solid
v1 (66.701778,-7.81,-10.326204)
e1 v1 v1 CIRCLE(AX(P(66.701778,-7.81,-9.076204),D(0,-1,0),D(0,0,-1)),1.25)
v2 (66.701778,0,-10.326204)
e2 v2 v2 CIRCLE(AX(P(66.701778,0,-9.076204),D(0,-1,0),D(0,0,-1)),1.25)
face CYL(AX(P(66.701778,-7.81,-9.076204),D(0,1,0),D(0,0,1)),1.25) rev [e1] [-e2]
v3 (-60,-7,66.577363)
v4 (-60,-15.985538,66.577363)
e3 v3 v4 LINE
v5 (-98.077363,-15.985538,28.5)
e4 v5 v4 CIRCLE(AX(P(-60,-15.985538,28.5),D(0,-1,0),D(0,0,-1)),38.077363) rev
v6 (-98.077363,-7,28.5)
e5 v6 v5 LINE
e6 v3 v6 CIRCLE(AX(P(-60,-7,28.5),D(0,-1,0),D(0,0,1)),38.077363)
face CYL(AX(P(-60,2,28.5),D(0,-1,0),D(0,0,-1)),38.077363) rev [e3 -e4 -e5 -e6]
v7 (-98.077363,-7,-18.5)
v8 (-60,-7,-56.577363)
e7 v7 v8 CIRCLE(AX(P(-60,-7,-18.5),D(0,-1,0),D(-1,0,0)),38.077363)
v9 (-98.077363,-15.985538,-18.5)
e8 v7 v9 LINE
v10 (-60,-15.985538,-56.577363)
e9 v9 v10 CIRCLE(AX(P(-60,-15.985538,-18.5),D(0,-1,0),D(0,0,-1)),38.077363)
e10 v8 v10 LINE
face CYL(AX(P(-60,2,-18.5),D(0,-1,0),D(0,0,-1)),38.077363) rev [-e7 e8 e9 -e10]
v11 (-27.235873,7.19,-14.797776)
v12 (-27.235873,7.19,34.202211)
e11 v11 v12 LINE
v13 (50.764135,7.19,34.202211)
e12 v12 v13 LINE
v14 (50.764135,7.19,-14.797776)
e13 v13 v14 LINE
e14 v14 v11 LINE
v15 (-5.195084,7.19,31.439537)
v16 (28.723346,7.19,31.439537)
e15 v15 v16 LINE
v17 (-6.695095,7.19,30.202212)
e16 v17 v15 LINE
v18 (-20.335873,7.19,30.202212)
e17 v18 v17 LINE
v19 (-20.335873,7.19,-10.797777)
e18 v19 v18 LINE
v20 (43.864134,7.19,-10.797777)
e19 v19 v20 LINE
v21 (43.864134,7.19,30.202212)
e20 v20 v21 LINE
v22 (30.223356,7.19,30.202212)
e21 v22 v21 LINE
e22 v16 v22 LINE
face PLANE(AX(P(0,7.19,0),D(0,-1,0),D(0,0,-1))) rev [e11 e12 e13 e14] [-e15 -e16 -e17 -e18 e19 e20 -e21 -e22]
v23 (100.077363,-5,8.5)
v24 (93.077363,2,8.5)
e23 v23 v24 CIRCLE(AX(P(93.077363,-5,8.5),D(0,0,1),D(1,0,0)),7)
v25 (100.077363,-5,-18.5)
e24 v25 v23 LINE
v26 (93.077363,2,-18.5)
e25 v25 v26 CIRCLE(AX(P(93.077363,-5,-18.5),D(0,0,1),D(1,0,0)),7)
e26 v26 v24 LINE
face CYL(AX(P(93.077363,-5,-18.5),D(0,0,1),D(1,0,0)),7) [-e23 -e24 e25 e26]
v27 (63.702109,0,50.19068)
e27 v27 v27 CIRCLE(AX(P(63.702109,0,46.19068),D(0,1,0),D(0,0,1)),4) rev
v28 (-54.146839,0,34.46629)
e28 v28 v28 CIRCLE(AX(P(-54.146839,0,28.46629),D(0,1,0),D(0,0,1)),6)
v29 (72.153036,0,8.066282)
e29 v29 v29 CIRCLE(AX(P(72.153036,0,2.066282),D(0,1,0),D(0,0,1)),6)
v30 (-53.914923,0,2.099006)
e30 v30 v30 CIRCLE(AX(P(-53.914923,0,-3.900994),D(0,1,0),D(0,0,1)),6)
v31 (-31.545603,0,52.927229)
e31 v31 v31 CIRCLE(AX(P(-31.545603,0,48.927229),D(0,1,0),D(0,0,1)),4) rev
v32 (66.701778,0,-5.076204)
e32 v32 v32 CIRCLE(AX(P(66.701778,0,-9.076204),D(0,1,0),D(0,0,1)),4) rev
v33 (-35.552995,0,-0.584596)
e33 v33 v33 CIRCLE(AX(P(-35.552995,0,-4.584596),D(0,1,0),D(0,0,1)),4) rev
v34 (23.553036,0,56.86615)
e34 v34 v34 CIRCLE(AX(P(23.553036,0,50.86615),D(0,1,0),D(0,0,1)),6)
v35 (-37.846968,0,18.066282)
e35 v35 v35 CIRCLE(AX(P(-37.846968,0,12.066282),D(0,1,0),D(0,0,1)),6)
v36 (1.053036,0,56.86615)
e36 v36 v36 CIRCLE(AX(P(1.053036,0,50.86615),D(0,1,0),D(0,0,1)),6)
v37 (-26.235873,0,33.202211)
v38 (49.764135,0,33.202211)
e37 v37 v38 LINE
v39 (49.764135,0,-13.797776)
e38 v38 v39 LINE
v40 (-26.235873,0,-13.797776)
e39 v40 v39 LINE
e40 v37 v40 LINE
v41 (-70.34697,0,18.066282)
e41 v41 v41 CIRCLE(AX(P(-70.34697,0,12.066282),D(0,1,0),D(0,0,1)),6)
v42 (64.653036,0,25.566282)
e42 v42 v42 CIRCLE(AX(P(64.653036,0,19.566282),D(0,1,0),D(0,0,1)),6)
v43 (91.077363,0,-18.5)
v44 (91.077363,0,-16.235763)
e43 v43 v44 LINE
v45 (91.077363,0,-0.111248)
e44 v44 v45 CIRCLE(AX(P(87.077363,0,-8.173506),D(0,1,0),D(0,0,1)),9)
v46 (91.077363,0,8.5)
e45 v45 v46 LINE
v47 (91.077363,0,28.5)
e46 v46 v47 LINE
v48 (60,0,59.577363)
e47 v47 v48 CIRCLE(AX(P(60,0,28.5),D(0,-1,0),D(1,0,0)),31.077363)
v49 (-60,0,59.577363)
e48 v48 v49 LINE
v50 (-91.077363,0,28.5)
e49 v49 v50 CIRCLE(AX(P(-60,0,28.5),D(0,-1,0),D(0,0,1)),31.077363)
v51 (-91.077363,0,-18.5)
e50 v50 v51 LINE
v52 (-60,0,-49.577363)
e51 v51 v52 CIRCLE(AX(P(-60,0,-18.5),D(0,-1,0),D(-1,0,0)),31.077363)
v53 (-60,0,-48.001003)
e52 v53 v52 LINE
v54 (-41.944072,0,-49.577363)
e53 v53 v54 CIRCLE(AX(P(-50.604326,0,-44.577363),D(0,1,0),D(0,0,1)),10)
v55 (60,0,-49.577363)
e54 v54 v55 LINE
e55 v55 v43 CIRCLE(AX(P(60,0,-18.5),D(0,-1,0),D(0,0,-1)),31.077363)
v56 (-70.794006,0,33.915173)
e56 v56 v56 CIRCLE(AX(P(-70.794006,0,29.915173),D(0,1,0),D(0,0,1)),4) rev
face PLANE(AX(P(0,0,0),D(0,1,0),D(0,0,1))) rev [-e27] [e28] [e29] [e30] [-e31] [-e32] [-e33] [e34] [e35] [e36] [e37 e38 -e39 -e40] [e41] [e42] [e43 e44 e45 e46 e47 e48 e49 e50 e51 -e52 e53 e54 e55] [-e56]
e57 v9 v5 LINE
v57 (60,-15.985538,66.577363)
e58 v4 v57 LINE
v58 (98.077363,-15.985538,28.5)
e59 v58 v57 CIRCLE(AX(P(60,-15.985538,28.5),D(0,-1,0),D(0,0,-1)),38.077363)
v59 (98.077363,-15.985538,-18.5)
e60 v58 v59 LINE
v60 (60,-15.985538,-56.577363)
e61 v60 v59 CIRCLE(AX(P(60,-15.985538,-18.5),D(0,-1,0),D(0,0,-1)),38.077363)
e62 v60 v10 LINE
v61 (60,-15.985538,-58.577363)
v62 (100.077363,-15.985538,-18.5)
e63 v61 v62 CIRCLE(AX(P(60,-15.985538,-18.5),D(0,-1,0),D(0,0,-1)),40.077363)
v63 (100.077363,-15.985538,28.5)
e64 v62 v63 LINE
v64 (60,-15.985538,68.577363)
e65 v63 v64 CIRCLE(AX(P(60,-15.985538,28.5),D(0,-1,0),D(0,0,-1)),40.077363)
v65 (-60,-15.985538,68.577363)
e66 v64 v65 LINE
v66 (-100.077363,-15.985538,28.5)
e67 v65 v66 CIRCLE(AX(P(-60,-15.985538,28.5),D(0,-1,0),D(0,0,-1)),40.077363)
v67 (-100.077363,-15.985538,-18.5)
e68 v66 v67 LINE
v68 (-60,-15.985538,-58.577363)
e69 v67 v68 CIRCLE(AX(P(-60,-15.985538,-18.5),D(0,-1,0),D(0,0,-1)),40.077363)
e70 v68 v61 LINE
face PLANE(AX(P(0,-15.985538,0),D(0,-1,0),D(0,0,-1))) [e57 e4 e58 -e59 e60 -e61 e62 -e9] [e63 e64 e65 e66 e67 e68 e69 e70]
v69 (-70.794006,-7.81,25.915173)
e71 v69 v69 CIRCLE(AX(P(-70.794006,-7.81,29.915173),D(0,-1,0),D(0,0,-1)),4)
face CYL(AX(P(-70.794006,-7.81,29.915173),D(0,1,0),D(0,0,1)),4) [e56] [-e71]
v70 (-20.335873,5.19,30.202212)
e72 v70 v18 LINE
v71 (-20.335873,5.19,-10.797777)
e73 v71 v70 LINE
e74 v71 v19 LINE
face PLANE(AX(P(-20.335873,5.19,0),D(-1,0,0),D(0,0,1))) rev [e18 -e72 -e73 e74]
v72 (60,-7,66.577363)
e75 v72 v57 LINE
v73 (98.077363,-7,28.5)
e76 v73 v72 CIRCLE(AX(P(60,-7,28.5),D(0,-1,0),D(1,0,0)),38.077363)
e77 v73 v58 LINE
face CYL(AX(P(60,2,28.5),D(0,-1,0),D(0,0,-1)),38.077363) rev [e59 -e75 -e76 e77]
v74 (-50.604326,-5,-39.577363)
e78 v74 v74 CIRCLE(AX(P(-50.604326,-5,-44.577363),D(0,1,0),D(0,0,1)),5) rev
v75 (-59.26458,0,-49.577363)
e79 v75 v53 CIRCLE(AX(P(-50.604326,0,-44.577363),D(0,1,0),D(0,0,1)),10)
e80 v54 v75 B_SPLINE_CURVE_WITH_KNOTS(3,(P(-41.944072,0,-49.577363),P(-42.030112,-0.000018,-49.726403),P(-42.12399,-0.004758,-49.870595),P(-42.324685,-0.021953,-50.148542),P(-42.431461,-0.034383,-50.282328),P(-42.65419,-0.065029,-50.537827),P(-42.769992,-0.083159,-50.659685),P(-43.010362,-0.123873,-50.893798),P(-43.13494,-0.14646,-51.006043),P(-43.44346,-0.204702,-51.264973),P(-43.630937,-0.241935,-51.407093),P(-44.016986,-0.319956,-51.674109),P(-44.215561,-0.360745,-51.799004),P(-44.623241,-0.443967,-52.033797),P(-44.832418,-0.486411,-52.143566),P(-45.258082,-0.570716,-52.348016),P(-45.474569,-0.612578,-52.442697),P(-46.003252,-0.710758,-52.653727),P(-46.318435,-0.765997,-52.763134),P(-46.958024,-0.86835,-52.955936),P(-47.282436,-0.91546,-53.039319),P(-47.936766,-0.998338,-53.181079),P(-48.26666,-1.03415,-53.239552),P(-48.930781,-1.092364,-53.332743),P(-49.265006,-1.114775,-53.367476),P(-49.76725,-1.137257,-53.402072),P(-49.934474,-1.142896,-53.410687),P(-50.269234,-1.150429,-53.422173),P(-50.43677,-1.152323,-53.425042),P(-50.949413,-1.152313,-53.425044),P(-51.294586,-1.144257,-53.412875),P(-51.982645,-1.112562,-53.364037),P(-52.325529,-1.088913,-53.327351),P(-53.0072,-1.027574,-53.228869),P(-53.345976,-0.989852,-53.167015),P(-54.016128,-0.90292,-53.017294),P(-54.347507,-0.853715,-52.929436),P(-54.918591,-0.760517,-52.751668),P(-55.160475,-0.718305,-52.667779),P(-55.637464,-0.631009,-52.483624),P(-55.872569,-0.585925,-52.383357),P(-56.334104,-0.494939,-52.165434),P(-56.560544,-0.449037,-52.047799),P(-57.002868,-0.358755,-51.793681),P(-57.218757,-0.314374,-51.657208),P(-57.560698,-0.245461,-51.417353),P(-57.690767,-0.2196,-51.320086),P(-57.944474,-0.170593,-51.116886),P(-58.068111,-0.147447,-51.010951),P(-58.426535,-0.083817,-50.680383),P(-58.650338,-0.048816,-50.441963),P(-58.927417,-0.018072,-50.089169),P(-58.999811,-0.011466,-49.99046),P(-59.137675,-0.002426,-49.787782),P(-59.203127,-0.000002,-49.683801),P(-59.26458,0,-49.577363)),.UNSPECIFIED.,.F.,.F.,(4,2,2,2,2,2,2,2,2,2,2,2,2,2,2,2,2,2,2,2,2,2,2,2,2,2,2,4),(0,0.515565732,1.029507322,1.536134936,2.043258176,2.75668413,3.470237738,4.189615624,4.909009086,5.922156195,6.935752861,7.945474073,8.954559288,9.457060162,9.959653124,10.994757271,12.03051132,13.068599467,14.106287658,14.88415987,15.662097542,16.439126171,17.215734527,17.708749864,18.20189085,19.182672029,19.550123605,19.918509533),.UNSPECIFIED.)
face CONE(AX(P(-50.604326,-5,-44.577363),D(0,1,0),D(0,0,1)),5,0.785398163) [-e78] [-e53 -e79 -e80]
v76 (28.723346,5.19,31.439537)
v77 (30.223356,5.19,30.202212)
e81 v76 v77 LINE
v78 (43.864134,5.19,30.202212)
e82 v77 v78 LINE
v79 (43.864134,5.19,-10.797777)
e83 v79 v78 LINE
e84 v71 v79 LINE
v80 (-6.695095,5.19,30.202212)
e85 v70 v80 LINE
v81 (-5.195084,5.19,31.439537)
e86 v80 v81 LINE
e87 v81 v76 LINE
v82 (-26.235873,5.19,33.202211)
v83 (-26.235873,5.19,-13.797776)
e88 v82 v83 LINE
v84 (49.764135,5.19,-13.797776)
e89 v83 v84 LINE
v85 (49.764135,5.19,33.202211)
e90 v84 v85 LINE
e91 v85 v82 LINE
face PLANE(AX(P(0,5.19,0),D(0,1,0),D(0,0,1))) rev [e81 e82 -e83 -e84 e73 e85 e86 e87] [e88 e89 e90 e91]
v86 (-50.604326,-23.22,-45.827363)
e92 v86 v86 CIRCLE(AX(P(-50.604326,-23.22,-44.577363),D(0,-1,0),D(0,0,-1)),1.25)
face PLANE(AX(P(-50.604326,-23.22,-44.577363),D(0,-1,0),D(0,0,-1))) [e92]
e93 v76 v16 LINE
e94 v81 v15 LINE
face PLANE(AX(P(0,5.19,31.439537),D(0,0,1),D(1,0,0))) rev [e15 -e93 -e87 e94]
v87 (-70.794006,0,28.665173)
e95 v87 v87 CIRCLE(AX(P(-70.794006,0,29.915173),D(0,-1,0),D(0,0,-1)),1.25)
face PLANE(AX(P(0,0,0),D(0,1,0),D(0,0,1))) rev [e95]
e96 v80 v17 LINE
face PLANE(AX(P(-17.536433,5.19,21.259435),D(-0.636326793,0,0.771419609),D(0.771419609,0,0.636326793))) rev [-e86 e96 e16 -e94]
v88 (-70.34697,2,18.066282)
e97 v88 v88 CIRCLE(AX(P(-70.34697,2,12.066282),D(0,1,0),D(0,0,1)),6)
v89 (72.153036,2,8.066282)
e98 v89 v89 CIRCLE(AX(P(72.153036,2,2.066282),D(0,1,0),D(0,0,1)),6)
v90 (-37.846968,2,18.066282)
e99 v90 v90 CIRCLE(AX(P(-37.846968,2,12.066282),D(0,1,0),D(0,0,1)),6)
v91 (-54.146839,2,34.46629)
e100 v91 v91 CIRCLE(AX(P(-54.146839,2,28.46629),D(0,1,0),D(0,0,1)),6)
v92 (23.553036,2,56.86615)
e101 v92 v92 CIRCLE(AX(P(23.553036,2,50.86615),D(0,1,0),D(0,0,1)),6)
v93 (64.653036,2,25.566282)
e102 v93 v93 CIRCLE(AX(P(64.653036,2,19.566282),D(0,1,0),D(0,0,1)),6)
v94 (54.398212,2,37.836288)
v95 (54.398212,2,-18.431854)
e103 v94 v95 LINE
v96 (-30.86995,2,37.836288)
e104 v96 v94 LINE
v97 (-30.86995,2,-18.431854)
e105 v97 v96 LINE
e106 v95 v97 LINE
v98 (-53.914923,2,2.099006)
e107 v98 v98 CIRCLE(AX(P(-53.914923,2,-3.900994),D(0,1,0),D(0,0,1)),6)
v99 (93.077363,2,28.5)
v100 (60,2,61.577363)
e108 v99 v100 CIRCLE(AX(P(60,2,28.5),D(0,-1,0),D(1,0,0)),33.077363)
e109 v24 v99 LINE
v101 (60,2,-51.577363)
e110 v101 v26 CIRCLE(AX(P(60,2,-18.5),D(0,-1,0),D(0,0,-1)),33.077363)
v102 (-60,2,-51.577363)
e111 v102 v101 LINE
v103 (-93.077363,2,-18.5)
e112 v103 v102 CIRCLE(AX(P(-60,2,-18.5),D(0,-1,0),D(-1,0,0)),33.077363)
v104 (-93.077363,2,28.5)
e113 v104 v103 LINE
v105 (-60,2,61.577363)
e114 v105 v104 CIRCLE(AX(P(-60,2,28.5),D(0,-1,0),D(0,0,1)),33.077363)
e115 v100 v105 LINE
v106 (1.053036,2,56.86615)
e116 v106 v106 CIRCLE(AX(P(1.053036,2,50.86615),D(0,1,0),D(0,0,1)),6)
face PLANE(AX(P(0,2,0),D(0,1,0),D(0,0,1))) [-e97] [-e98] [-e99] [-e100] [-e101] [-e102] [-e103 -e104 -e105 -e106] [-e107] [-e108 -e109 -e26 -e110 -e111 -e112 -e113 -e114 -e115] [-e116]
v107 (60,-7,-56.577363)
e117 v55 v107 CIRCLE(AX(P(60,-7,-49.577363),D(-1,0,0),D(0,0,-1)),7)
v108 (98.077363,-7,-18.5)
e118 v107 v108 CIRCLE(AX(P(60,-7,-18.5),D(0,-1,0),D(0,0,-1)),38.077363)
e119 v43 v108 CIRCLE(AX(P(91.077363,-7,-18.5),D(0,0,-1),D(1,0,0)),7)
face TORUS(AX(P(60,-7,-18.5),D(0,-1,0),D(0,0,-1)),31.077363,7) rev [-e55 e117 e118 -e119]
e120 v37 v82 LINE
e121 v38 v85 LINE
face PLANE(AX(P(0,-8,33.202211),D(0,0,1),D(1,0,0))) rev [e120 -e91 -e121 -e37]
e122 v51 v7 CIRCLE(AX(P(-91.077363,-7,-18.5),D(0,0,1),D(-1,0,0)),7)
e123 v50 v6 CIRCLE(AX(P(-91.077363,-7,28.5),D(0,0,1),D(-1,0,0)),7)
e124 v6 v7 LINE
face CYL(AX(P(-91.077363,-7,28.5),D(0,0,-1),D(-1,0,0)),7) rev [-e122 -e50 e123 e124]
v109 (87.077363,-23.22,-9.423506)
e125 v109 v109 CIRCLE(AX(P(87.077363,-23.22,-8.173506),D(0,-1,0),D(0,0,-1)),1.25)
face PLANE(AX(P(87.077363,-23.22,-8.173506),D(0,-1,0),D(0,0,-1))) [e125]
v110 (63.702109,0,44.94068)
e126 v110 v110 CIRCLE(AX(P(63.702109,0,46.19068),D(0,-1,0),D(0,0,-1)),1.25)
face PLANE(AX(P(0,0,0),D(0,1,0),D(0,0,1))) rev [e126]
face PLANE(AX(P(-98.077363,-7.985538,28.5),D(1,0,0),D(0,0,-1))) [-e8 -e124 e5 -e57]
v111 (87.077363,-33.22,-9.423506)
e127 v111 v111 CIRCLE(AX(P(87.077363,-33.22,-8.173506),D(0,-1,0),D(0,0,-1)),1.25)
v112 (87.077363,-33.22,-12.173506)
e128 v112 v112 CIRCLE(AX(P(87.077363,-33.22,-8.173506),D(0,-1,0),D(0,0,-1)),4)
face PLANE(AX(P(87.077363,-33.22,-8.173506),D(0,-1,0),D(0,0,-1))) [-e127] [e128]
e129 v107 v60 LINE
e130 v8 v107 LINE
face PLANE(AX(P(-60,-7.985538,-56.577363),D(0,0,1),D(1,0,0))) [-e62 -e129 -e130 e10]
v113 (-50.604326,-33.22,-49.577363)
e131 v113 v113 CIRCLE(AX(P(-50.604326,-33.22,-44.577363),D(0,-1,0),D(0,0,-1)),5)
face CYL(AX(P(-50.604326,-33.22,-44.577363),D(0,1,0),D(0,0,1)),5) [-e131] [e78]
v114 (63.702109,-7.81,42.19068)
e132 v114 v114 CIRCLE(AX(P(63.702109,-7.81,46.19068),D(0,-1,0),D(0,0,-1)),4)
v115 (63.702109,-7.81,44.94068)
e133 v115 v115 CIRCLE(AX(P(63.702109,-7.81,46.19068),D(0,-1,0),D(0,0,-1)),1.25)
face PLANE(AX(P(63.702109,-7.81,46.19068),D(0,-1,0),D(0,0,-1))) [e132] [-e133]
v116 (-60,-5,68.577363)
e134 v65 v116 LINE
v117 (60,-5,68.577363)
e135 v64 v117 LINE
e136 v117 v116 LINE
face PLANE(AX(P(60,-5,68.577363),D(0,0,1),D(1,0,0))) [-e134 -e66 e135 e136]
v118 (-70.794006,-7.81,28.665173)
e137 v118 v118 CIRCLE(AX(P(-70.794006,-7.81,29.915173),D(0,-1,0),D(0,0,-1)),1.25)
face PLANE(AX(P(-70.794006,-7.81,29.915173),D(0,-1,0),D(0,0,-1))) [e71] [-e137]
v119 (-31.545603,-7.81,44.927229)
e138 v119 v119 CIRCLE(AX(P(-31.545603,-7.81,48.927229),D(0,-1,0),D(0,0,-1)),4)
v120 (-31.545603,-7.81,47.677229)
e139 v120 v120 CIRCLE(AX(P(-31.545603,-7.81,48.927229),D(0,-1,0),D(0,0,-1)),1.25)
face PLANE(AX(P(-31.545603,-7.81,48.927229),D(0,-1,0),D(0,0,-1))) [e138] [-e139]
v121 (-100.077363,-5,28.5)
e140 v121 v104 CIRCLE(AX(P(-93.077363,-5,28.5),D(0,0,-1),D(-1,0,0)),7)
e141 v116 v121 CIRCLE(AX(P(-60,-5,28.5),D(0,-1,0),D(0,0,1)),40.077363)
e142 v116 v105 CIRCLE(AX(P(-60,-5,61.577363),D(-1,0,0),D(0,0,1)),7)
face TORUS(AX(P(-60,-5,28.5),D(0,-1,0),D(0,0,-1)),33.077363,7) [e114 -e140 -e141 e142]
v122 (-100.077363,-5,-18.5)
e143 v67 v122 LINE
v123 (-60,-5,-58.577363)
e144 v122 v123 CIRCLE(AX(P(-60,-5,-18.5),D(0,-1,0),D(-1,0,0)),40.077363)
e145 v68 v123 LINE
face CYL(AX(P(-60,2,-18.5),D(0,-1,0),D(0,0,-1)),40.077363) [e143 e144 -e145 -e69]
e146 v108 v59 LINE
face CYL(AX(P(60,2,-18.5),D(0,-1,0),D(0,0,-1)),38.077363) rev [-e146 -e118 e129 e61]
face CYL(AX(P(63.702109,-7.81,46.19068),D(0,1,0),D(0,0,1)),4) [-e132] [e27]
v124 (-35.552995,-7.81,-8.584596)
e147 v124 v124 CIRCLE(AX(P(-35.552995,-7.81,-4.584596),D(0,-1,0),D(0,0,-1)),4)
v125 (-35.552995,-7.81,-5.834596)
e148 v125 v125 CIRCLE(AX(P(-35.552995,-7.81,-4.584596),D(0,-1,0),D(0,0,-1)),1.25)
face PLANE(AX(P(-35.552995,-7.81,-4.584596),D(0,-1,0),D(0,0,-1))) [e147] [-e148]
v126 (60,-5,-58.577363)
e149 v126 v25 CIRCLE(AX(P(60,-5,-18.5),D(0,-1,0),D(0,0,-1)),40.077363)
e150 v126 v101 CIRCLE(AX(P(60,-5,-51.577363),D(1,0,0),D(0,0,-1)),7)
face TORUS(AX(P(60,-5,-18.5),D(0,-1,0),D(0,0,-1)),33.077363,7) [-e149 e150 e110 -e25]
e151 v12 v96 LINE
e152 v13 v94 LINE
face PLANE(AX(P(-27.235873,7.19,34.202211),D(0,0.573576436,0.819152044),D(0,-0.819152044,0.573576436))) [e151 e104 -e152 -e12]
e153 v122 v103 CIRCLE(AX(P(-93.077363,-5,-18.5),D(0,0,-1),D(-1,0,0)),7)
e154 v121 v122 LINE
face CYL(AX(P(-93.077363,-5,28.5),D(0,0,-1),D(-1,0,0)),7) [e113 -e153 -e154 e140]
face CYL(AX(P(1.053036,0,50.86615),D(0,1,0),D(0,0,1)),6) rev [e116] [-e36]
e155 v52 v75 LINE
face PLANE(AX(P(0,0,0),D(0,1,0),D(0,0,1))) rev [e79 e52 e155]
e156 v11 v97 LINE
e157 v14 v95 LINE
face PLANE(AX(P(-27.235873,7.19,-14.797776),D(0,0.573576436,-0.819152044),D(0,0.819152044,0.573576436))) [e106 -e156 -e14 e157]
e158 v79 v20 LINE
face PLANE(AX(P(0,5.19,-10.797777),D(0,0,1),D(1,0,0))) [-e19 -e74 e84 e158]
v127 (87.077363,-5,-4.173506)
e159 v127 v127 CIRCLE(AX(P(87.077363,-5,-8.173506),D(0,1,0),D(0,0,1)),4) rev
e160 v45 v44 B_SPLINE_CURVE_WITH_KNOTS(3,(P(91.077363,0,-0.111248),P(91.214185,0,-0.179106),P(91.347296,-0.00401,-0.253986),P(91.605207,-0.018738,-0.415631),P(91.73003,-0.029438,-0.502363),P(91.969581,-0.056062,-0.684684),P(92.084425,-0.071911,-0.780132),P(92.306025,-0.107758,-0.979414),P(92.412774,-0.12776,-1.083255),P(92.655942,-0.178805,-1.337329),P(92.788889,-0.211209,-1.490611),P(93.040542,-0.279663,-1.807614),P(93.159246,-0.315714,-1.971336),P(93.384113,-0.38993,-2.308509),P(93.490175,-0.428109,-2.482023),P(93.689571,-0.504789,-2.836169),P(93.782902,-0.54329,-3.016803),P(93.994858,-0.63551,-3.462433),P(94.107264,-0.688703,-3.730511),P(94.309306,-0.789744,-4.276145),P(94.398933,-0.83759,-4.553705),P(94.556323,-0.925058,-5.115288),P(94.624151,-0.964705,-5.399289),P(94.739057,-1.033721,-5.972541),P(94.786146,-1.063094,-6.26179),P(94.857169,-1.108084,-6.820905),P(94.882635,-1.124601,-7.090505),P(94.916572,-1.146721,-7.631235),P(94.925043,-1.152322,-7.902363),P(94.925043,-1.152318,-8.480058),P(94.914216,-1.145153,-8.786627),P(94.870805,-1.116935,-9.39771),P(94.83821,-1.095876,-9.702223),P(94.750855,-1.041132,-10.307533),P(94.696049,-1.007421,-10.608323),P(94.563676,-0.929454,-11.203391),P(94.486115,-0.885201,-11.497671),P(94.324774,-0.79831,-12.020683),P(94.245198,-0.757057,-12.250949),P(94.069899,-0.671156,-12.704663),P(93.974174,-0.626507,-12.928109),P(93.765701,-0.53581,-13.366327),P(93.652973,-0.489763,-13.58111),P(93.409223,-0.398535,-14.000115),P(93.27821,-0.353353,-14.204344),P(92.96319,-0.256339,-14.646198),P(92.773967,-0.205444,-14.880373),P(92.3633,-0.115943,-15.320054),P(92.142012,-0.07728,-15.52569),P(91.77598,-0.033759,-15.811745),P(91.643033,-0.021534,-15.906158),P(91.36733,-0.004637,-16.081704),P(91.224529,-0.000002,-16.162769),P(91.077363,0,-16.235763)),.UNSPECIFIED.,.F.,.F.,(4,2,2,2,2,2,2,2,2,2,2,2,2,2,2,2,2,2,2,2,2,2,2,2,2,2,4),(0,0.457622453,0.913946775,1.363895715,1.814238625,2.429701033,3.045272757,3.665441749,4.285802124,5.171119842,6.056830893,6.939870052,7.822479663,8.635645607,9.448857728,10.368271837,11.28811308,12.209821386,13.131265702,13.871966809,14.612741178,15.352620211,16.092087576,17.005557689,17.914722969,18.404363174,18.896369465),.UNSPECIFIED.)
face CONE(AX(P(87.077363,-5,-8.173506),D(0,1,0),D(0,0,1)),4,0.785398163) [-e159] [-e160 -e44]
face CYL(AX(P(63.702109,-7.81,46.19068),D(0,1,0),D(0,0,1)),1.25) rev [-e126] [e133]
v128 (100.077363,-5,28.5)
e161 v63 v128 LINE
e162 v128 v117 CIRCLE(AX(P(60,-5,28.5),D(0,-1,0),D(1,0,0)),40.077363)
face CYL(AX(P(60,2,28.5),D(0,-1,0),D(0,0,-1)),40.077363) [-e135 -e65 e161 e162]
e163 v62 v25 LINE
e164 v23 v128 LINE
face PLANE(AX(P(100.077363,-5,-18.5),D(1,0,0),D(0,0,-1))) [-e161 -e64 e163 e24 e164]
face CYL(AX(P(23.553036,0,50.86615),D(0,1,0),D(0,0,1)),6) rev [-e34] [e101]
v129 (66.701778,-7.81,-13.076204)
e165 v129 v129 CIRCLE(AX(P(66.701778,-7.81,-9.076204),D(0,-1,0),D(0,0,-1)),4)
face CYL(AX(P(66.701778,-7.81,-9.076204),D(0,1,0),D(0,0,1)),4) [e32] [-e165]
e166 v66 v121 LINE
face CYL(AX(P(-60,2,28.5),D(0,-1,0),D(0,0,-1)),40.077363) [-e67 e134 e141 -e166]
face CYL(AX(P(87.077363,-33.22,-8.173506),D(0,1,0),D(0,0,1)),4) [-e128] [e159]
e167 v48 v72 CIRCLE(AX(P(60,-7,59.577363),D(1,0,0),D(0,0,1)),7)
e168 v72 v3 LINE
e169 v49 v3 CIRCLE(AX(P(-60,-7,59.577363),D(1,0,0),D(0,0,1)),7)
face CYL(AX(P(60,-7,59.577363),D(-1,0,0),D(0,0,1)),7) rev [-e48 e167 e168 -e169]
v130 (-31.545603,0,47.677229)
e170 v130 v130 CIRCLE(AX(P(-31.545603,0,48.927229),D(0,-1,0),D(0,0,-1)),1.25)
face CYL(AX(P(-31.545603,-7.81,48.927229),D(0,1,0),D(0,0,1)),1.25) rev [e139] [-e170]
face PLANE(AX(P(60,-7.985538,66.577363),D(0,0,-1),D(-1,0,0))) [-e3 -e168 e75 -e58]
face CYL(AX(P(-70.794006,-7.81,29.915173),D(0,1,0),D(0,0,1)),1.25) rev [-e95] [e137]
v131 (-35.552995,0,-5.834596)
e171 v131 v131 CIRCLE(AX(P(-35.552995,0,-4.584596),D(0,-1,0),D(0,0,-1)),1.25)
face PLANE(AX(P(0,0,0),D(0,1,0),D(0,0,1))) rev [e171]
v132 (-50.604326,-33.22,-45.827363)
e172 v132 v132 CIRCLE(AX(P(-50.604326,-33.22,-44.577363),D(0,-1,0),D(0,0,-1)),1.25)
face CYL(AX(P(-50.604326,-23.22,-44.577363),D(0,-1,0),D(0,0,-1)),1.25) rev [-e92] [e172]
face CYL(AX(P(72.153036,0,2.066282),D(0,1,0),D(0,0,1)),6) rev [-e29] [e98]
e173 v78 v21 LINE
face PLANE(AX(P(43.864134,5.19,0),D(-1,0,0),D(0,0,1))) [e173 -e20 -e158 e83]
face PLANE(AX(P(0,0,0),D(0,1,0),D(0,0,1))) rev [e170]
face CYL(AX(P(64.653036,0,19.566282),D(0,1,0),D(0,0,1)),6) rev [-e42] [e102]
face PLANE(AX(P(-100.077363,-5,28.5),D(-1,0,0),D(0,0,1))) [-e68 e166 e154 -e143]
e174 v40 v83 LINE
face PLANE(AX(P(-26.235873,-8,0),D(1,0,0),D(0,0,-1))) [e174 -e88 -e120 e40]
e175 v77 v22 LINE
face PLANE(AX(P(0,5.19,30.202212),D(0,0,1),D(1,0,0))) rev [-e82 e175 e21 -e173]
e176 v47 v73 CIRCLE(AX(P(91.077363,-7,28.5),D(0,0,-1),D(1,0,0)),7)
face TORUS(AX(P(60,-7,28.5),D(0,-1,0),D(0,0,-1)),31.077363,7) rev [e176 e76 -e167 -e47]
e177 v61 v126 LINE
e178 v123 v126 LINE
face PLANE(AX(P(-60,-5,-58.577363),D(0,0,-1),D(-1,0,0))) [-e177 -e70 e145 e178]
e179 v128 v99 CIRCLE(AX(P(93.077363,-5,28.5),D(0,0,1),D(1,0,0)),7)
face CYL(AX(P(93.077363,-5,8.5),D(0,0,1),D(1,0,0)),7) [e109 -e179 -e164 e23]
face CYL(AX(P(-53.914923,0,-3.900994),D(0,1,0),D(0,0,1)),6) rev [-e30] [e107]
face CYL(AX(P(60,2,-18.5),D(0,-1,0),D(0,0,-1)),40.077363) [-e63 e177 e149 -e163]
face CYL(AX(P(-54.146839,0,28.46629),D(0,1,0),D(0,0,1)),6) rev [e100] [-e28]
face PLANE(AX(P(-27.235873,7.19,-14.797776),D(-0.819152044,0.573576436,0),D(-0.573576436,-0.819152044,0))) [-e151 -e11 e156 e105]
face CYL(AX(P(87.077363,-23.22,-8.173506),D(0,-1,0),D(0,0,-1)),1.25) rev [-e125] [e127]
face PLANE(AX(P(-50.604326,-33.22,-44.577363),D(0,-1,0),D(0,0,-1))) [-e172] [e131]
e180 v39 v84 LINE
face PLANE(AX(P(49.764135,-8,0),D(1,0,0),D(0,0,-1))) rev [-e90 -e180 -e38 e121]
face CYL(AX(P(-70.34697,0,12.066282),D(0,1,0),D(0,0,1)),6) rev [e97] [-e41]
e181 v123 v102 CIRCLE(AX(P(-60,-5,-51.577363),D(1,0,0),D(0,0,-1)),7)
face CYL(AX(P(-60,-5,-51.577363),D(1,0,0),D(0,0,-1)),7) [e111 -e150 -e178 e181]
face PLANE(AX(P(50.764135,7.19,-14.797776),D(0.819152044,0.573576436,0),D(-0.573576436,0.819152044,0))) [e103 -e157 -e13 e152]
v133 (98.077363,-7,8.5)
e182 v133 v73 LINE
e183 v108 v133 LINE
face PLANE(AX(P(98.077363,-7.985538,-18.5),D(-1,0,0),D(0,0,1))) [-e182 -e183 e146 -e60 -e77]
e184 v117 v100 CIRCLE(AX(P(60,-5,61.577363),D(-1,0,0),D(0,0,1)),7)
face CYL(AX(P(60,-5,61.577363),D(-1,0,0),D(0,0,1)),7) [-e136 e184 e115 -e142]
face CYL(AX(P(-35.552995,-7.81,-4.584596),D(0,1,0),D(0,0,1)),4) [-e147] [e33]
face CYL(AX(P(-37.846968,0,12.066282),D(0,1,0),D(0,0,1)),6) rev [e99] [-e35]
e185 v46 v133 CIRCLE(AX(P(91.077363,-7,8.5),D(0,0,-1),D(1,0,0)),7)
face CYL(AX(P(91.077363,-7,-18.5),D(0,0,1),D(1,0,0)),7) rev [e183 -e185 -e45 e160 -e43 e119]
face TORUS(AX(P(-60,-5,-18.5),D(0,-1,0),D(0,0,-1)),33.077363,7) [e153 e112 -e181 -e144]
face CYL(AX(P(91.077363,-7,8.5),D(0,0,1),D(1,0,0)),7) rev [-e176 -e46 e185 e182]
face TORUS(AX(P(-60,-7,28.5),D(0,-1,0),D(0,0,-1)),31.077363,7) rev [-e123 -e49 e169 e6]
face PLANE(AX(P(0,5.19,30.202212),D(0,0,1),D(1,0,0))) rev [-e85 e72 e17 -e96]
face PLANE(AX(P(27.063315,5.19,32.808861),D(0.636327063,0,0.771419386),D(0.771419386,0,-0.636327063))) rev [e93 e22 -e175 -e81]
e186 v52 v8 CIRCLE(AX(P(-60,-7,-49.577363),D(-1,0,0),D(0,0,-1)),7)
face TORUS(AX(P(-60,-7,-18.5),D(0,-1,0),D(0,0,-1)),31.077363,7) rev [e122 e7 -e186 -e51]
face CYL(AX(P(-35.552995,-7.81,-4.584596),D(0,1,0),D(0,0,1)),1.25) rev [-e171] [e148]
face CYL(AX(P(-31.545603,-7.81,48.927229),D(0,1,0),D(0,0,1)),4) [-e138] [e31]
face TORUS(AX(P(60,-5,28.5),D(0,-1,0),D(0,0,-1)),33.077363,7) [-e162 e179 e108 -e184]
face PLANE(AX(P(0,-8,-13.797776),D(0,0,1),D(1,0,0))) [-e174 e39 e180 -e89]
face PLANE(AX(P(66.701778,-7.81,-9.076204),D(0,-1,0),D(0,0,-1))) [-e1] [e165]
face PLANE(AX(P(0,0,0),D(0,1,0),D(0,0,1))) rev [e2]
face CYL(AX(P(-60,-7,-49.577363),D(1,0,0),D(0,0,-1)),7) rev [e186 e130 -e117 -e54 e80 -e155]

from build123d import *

# Parameters (mm, degrees)
SKETCH1_W           = 160
SKETCH1_H           = 117
BOSS_EXTRUDE1_DEPTH = 2
SKETCH3_R           = 6
CUT_EXTRUDE1_DEPTH  = 100.127443223
SKETCH4_R           = 6
CUT_EXTRUDE3_DEPTH  = 100.127443223
SKETCH5_R           = 6
CUT_EXTRUDE4_DEPTH  = 100.127443223
SKETCH6_W           = 76.000007526
SKETCH6_H           = 46.999987397
SKETCH6_W_2         = 72.000007526
SKETCH6_H_2         = 42.999987397
CUT_EXTRUDE5_DEPTH  = 10
SKETCH7_R           = 4
SKETCH7_R_2         = 1.25
BOSS_EXTRUDE2_DEPTH = 7.81
SKETCH8_W           = 78.000007526
SKETCH8_H           = 48.999987397
SKETCH8_W_2         = 76.000007526
SKETCH8_H_2         = 46.999987397
BOSS_EXTRUDE3_DEPTH = 5.19
SKETCH9_W           = 76.000007526
SKETCH9_H           = 46.999987397
BOSS_EXTRUDE4_DEPTH = 2
DRAFT2_ANGLE        = 35
SKETCH12_W          = 160
SKETCH12_H          = 14.938358446
SKETCH12_W_2        = 31.199462864
SKETCH12_H_2        = 9.099678356
SKETCH12_W_3        = 31.607152295
SKETCH12_H_3        = 7.36210802
CUT_EXTRUDE7_DEPTH  = 10
SKETCH13_R          = 6
CUT_EXTRUDE8_DEPTH  = 10
SKETCH14_W          = 120
SKETCH14_H          = 2
SKETCH14_W_2        = 2
SKETCH14_H_2        = 47
SKETCH14_H_3        = 27
SKETCH14_H_4        = 20
BOSS_EXTRUDE5_DEPTH = 8
SKETCH15_R          = 5
SKETCH15_R_2        = 4
BOSS_EXTRUDE6_DEPTH = 33.22
CHAMFER1_SIZE       = 5
SKETCH16_R          = 1.25
CUT_EXTRUDE9_DEPTH  = 10


with BuildPart() as part:
    # Sketch1 → Boss-Extrude1 (new body)
    with BuildSketch(Plane(origin=(0, 0, 0), x_dir=(1, 0, 0), z_dir=(0, 1, 0))):
        Rectangle(SKETCH1_W, SKETCH1_H)
    extrude(amount=BOSS_EXTRUDE1_DEPTH)

    # Sketch3 → Cut-Extrude1 (cut, through all)
    with BuildSketch(Plane(origin=(0, 2, 0), x_dir=(1, 0, 0), z_dir=(0, 1, 0))):
        with Locations(Location((72.15303621, -2.066282122, 0), (0, 0, 270))):
            Circle(SKETCH3_R)
    extrude(amount=-CUT_EXTRUDE1_DEPTH, mode=Mode.SUBTRACT)

    # Sketch4 → Cut-Extrude3 (cut, through all)
    with BuildSketch(Plane(origin=(0, 2, 0), x_dir=(1, 0, 0), z_dir=(0, 1, 0))):
        with Locations(Location((23.553035896, -50.866150132, 0), (0, 0, 270))):
            Circle(SKETCH4_R)
    extrude(amount=-CUT_EXTRUDE3_DEPTH, mode=Mode.SUBTRACT)

    # Sketch5 → Cut-Extrude4 (cut, through all)
    with BuildSketch(Plane(origin=(0, 2, 0), x_dir=(1, 0, 0), z_dir=(0, 1, 0))):
        with Locations(Location((64.653036213, -19.566282124, 0), (0, 0, 270))):
            Circle(SKETCH5_R)
        with Locations(Location((-37.846967603, -12.066282143, 0), (0, 0, 270))):
            Circle(SKETCH5_R)
        with Locations(Location((1.053035896, -50.866150137, 0), (0, 0, 270))):
            Circle(SKETCH5_R)
        with Locations(Location((-53.91492316, 3.900994062, 0), (0, 0, 270))):
            Circle(SKETCH5_R)
        with Locations(Location((-70.34696951, -12.066282149, 0), (0, 0, 270))):
            Circle(SKETCH5_R)
        with Locations(Location((-54.14683932, -28.466289977, 0), (0, 0, 270))):
            Circle(SKETCH5_R)
    extrude(amount=-CUT_EXTRUDE4_DEPTH, mode=Mode.SUBTRACT)

    # Sketch6 → Cut-Extrude5 (cut)
    with BuildSketch(Plane(origin=(0, 2, 0), x_dir=(1, 0, 0), z_dir=(0, 1, 0))):
        with Locations((11.764130909, -9.702217308)):
            Rectangle(SKETCH6_W, SKETCH6_H)
        with Locations((11.764130909, -9.702217308)):
            Rectangle(SKETCH6_W_2, SKETCH6_H_2, mode=Mode.SUBTRACT)
    extrude(amount=-CUT_EXTRUDE5_DEPTH, mode=Mode.SUBTRACT)


with BuildPart() as cut_extrude5_kept_piece:
    # of the separate pieces the step leaves, the one the design keeps (cut_extrude5_pieces_kept)
    add(part.part.solids().sort_by_distance((80, 0, 58.5))[0])

    # Sketch7 → Boss-Extrude2 (add)
    # profile 1 of 5: a face of its own
    with BuildSketch(Plane.XZ):
        with Locations(Location((66.701777656, -9.076203809, 0), (0, 0, 90))):
            Circle(SKETCH7_R)
        with Locations(Location((66.701777656, -9.076203809, 0), (0, 0, 270))):
            Circle(SKETCH7_R_2, mode=Mode.SUBTRACT)
    # profile 2 of 5: a face of its own
    with BuildSketch(Plane.XZ):
        with Locations(Location((63.702108967, 46.190679909, 0), (0, 0, 90))):
            Circle(SKETCH7_R)
        with Locations(Location((63.702108967, 46.190679909, 0), (0, 0, 270))):
            Circle(SKETCH7_R_2, mode=Mode.SUBTRACT)
    # profile 3 of 5: a face of its own
    with BuildSketch(Plane.XZ):
        with Locations(Location((-31.54560253, 48.927228564, 0), (0, 0, 90))):
            Circle(SKETCH7_R)
        with Locations(Location((-31.54560253, 48.927228564, 0), (0, 0, 270))):
            Circle(SKETCH7_R_2, mode=Mode.SUBTRACT)
    # profile 4 of 5: a face of its own
    with BuildSketch(Plane.XZ):
        with Locations(Location((-70.794006102, 29.915173129, 0), (0, 0, 90))):
            Circle(SKETCH7_R)
        with Locations(Location((-70.794006102, 29.915173129, 0), (0, 0, 270))):
            Circle(SKETCH7_R_2, mode=Mode.SUBTRACT)
    # profile 5 of 5: a face of its own
    with BuildSketch(Plane.XZ):
        with Locations(Location((-35.552994644, -4.584596423, 0), (0, 0, 90))):
            Circle(SKETCH7_R)
        with Locations(Location((-35.552994644, -4.584596423, 0), (0, 0, 270))):
            Circle(SKETCH7_R_2, mode=Mode.SUBTRACT)
    extrude(amount=BOSS_EXTRUDE2_DEPTH)

    # Sketch8 → Boss-Extrude3 (add)
    with BuildSketch(Plane(origin=(0, 2, 0), x_dir=(1, 0, 0), z_dir=(0, 1, 0))):
        with Locations((11.764130909, -9.702217308)):
            Rectangle(SKETCH8_W, SKETCH8_H)
        with Locations((11.764130909, -9.702217308)):
            Rectangle(SKETCH8_W_2, SKETCH8_H_2, mode=Mode.SUBTRACT)
    extrude(amount=BOSS_EXTRUDE3_DEPTH)

    # Sketch9 → Boss-Extrude4 (add)
    with BuildSketch(Plane(origin=(0, 7.19, 0), x_dir=(1, 0, 0), z_dir=(0, 1, 0))):
        with Locations((11.764130909, -9.702217308)):
            Rectangle(SKETCH9_W, SKETCH9_H)
        Polygon((-5.195084148, -31.43953726), (-6.695094805, -30.202211996), (-20.335872635, -30.202211996), (-20.335872635, 10.797777117), (43.864134191, 10.797777117), (43.864134191, -30.202211996), (30.223355703, -30.202211996), (28.723346116, -31.43953726), align=None, mode=Mode.SUBTRACT)
    extrude(amount=-BOSS_EXTRUDE4_DEPTH)

    # Draft2
    draft2_faces = [cut_extrude5_kept_piece.faces().sort_by_distance(p)[0] for p in [
        (11.764130909, 4.595, -14.79777639),
        (-27.235872854, 4.595, 9.702217309),
        (11.764130909, 4.595, 34.202211007),
        (50.764134672, 4.595, 9.702217309),
    ]]
    draft(draft2_faces, Plane.ZX.offset(7.19), DRAFT2_ANGLE)

    # Sketch12 → Cut-Extrude7 (cut)
    with BuildSketch(Plane(origin=(0, 2, 0), x_dir=(1, 0, 0), z_dir=(0, 1, 0))):
        with Locations((0, 51.030820777)):
            Rectangle(SKETCH12_W, SKETCH12_H)
        with Locations((-64.400268568, -53.950160822)):
            Rectangle(SKETCH12_W_2, SKETCH12_H_2)
        with Locations((64.196423853, -54.81894599)):
            Rectangle(SKETCH12_W_3, SKETCH12_H_3)
    extrude(amount=-CUT_EXTRUDE7_DEPTH, mode=Mode.SUBTRACT)

    # Sweep1: sweep along a path in Sketch10
    with BuildLine(Plane(origin=(0, 2, 0), x_dir=(1, 0, 0), z_dir=(0, 1, 0))) as sweep1_path:
        Line((-60, 58.5), (60, 58.5))
        ThreePointArc((60, 58.5), (88.284271247, 46.784271247), (100, 18.5))
        Line((100, 18.5), (100, -28.5))
        ThreePointArc((100, -28.5), (88.284271247, -56.784271247), (60, -68.5))
        Line((60, -68.5), (-60, -68.5))
        ThreePointArc((-60, -68.5), (-88.284271247, -56.784271247), (-100, -28.5))
        Line((-100, -28.5), (-100, 18.5))
        ThreePointArc((-100, 18.5), (-88.284271247, 46.784271247), (-60, 58.5))
    # Sketch11 → Sweep1 (sweep)
    with BuildSketch(Plane.XY.offset(8.5)):
        with BuildLine():
            Line((80, 2), (93.077362885, 2))
            ThreePointArc((93.077362885, 2), (98.027110354, -0.050252532), (100.077362885, -5))
            Line((100.077362885, -5), (100.077362885, -7.985538351))
            Line((100.077362885, -7.985538351), (98.077362885, -7.985538351))
            Line((98.077362885, -7.985538351), (98.077362885, -7))
            ThreePointArc((98.077362885, -7), (96.027110354, -2.050252532), (91.077362885, 0))
            Line((91.077362885, 0), (80, 0))
            Line((80, 0), (80, 2))
        make_face()
    sweep(path=sweep1_path.line)

    # Sketch13 → Cut-Extrude8 (cut)
    with BuildSketch(Plane(origin=(0, 2, 0), x_dir=(1, 0, 0), z_dir=(0, 1, 0))):
        with Locations(Location((1.053035896, -50.866150137, 0), (0, 0, 270))):
            Circle(SKETCH13_R)
        with Locations(Location((23.553035896, -50.866150132, 0), (0, 0, 270))):
            Circle(SKETCH13_R)
    extrude(amount=-CUT_EXTRUDE8_DEPTH, mode=Mode.SUBTRACT)

    # Sketch14 → Boss-Extrude5 (add)
    with BuildSketch(Plane.XZ.offset(7.985538351)):
        with Locations((0, 67.577362885)):
            Rectangle(SKETCH14_W, SKETCH14_H)
        with BuildLine():
            Line((-60, 66.577362885), (-60, 68.577362885))
            ThreePointArc((-60, 68.577362885), (-88.338975068, 56.838975068), (-100.077362885, 28.5))
            Line((-100.077362885, 28.5), (-98.077362885, 28.5))
            ThreePointArc((-98.077362885, 28.5), (-86.924761506, 55.424761506), (-60, 66.577362885))
        make_face()
        with Locations((-99.077362885, 5)):
            Rectangle(SKETCH14_W_2, SKETCH14_H_2)
        with BuildLine():
            ThreePointArc((-98.077362885, -18.5), (-86.924761506, -45.424761506), (-60, -56.577362885))
            Line((-60, -56.577362885), (-60, -58.577362885))
            ThreePointArc((-60, -58.577362885), (-88.338975068, -46.838975068), (-100.077362885, -18.5))
            Line((-100.077362885, -18.5), (-98.077362885, -18.5))
        make_face()
        with Locations((0, -57.577362885)):
            Rectangle(SKETCH14_W, SKETCH14_H)
        with BuildLine():
            ThreePointArc((60, -56.577362885), (86.924761506, -45.424761506), (98.077362885, -18.5))
            Line((98.077362885, -18.5), (100.077362885, -18.5))
            ThreePointArc((100.077362885, -18.5), (88.338975068, -46.838975068), (60, -58.577362885))
            Line((60, -58.577362885), (60, -56.577362885))
        make_face()
        with Locations((99.077362885, -5)):
            Rectangle(SKETCH14_W_2, SKETCH14_H_3)
        with Locations((99.077362885, 18.5)):
            Rectangle(SKETCH14_W_2, SKETCH14_H_4)
        with BuildLine():
            ThreePointArc((98.077362885, 28.5), (86.924761506, 55.424761506), (60, 66.577362885))
            Line((60, 66.577362885), (60, 68.577362885))
            ThreePointArc((60, 68.577362885), (88.338975068, 56.838975068), (100.077362885, 28.5))
            Line((100.077362885, 28.5), (98.077362885, 28.5))
        make_face()
    extrude(amount=BOSS_EXTRUDE5_DEPTH)

    # Sketch15 → Boss-Extrude6 (add)
    with BuildSketch(Plane.XZ):
        with Locations(Location((-50.604326003, -44.577362885, 0), (0, 0, 270))):
            Circle(SKETCH15_R)
        with Locations((87.077362885, -8.173505589)):
            Circle(SKETCH15_R_2)
    extrude(amount=BOSS_EXTRUDE6_DEPTH)

    # Chamfer1
    # the kernel refuses this chamfer: 5 mm, written as the material it adds along each edge
    with BuildSketch(Plane(origin=(-50.604326003, 0, -44.577362885), x_dir=(0, 0, -1), z_dir=(-1, 0, 0))) as chamfer1_piece_1:
        Polygon((5 + CHAMFER1_SIZE, 0), (5, CHAMFER1_SIZE), (5, 0), align=None)
    revolve(axis=Axis((-50.604326003, 0, -44.577362885), (0, -1, 0)))
    with BuildSketch(Plane(origin=(87.077362885, 0, -8.173505589), x_dir=(1, 0, 0), z_dir=(0, 0, -1))) as chamfer1_piece_2:
        Polygon((4 + CHAMFER1_SIZE, 0), (4, CHAMFER1_SIZE), (4, 0), align=None)
    revolve(axis=Axis((87.077362885, 0, -8.173505589), (0, -1, 0)))

    # Sketch16 → Cut-Extrude9 (cut)
    with BuildSketch(Plane.XZ.offset(33.22)):
        with Locations(Location((-50.604326003, -44.577362885, 0), (0, 0, 270))):
            Circle(SKETCH16_R)
        with Locations(Location((87.077362885, -8.173505589, 0), (0, 0, 270))):
            Circle(SKETCH16_R)
    extrude(amount=-CUT_EXTRUDE9_DEPTH, mode=Mode.SUBTRACT)


solid = cut_extrude5_kept_piece.part
